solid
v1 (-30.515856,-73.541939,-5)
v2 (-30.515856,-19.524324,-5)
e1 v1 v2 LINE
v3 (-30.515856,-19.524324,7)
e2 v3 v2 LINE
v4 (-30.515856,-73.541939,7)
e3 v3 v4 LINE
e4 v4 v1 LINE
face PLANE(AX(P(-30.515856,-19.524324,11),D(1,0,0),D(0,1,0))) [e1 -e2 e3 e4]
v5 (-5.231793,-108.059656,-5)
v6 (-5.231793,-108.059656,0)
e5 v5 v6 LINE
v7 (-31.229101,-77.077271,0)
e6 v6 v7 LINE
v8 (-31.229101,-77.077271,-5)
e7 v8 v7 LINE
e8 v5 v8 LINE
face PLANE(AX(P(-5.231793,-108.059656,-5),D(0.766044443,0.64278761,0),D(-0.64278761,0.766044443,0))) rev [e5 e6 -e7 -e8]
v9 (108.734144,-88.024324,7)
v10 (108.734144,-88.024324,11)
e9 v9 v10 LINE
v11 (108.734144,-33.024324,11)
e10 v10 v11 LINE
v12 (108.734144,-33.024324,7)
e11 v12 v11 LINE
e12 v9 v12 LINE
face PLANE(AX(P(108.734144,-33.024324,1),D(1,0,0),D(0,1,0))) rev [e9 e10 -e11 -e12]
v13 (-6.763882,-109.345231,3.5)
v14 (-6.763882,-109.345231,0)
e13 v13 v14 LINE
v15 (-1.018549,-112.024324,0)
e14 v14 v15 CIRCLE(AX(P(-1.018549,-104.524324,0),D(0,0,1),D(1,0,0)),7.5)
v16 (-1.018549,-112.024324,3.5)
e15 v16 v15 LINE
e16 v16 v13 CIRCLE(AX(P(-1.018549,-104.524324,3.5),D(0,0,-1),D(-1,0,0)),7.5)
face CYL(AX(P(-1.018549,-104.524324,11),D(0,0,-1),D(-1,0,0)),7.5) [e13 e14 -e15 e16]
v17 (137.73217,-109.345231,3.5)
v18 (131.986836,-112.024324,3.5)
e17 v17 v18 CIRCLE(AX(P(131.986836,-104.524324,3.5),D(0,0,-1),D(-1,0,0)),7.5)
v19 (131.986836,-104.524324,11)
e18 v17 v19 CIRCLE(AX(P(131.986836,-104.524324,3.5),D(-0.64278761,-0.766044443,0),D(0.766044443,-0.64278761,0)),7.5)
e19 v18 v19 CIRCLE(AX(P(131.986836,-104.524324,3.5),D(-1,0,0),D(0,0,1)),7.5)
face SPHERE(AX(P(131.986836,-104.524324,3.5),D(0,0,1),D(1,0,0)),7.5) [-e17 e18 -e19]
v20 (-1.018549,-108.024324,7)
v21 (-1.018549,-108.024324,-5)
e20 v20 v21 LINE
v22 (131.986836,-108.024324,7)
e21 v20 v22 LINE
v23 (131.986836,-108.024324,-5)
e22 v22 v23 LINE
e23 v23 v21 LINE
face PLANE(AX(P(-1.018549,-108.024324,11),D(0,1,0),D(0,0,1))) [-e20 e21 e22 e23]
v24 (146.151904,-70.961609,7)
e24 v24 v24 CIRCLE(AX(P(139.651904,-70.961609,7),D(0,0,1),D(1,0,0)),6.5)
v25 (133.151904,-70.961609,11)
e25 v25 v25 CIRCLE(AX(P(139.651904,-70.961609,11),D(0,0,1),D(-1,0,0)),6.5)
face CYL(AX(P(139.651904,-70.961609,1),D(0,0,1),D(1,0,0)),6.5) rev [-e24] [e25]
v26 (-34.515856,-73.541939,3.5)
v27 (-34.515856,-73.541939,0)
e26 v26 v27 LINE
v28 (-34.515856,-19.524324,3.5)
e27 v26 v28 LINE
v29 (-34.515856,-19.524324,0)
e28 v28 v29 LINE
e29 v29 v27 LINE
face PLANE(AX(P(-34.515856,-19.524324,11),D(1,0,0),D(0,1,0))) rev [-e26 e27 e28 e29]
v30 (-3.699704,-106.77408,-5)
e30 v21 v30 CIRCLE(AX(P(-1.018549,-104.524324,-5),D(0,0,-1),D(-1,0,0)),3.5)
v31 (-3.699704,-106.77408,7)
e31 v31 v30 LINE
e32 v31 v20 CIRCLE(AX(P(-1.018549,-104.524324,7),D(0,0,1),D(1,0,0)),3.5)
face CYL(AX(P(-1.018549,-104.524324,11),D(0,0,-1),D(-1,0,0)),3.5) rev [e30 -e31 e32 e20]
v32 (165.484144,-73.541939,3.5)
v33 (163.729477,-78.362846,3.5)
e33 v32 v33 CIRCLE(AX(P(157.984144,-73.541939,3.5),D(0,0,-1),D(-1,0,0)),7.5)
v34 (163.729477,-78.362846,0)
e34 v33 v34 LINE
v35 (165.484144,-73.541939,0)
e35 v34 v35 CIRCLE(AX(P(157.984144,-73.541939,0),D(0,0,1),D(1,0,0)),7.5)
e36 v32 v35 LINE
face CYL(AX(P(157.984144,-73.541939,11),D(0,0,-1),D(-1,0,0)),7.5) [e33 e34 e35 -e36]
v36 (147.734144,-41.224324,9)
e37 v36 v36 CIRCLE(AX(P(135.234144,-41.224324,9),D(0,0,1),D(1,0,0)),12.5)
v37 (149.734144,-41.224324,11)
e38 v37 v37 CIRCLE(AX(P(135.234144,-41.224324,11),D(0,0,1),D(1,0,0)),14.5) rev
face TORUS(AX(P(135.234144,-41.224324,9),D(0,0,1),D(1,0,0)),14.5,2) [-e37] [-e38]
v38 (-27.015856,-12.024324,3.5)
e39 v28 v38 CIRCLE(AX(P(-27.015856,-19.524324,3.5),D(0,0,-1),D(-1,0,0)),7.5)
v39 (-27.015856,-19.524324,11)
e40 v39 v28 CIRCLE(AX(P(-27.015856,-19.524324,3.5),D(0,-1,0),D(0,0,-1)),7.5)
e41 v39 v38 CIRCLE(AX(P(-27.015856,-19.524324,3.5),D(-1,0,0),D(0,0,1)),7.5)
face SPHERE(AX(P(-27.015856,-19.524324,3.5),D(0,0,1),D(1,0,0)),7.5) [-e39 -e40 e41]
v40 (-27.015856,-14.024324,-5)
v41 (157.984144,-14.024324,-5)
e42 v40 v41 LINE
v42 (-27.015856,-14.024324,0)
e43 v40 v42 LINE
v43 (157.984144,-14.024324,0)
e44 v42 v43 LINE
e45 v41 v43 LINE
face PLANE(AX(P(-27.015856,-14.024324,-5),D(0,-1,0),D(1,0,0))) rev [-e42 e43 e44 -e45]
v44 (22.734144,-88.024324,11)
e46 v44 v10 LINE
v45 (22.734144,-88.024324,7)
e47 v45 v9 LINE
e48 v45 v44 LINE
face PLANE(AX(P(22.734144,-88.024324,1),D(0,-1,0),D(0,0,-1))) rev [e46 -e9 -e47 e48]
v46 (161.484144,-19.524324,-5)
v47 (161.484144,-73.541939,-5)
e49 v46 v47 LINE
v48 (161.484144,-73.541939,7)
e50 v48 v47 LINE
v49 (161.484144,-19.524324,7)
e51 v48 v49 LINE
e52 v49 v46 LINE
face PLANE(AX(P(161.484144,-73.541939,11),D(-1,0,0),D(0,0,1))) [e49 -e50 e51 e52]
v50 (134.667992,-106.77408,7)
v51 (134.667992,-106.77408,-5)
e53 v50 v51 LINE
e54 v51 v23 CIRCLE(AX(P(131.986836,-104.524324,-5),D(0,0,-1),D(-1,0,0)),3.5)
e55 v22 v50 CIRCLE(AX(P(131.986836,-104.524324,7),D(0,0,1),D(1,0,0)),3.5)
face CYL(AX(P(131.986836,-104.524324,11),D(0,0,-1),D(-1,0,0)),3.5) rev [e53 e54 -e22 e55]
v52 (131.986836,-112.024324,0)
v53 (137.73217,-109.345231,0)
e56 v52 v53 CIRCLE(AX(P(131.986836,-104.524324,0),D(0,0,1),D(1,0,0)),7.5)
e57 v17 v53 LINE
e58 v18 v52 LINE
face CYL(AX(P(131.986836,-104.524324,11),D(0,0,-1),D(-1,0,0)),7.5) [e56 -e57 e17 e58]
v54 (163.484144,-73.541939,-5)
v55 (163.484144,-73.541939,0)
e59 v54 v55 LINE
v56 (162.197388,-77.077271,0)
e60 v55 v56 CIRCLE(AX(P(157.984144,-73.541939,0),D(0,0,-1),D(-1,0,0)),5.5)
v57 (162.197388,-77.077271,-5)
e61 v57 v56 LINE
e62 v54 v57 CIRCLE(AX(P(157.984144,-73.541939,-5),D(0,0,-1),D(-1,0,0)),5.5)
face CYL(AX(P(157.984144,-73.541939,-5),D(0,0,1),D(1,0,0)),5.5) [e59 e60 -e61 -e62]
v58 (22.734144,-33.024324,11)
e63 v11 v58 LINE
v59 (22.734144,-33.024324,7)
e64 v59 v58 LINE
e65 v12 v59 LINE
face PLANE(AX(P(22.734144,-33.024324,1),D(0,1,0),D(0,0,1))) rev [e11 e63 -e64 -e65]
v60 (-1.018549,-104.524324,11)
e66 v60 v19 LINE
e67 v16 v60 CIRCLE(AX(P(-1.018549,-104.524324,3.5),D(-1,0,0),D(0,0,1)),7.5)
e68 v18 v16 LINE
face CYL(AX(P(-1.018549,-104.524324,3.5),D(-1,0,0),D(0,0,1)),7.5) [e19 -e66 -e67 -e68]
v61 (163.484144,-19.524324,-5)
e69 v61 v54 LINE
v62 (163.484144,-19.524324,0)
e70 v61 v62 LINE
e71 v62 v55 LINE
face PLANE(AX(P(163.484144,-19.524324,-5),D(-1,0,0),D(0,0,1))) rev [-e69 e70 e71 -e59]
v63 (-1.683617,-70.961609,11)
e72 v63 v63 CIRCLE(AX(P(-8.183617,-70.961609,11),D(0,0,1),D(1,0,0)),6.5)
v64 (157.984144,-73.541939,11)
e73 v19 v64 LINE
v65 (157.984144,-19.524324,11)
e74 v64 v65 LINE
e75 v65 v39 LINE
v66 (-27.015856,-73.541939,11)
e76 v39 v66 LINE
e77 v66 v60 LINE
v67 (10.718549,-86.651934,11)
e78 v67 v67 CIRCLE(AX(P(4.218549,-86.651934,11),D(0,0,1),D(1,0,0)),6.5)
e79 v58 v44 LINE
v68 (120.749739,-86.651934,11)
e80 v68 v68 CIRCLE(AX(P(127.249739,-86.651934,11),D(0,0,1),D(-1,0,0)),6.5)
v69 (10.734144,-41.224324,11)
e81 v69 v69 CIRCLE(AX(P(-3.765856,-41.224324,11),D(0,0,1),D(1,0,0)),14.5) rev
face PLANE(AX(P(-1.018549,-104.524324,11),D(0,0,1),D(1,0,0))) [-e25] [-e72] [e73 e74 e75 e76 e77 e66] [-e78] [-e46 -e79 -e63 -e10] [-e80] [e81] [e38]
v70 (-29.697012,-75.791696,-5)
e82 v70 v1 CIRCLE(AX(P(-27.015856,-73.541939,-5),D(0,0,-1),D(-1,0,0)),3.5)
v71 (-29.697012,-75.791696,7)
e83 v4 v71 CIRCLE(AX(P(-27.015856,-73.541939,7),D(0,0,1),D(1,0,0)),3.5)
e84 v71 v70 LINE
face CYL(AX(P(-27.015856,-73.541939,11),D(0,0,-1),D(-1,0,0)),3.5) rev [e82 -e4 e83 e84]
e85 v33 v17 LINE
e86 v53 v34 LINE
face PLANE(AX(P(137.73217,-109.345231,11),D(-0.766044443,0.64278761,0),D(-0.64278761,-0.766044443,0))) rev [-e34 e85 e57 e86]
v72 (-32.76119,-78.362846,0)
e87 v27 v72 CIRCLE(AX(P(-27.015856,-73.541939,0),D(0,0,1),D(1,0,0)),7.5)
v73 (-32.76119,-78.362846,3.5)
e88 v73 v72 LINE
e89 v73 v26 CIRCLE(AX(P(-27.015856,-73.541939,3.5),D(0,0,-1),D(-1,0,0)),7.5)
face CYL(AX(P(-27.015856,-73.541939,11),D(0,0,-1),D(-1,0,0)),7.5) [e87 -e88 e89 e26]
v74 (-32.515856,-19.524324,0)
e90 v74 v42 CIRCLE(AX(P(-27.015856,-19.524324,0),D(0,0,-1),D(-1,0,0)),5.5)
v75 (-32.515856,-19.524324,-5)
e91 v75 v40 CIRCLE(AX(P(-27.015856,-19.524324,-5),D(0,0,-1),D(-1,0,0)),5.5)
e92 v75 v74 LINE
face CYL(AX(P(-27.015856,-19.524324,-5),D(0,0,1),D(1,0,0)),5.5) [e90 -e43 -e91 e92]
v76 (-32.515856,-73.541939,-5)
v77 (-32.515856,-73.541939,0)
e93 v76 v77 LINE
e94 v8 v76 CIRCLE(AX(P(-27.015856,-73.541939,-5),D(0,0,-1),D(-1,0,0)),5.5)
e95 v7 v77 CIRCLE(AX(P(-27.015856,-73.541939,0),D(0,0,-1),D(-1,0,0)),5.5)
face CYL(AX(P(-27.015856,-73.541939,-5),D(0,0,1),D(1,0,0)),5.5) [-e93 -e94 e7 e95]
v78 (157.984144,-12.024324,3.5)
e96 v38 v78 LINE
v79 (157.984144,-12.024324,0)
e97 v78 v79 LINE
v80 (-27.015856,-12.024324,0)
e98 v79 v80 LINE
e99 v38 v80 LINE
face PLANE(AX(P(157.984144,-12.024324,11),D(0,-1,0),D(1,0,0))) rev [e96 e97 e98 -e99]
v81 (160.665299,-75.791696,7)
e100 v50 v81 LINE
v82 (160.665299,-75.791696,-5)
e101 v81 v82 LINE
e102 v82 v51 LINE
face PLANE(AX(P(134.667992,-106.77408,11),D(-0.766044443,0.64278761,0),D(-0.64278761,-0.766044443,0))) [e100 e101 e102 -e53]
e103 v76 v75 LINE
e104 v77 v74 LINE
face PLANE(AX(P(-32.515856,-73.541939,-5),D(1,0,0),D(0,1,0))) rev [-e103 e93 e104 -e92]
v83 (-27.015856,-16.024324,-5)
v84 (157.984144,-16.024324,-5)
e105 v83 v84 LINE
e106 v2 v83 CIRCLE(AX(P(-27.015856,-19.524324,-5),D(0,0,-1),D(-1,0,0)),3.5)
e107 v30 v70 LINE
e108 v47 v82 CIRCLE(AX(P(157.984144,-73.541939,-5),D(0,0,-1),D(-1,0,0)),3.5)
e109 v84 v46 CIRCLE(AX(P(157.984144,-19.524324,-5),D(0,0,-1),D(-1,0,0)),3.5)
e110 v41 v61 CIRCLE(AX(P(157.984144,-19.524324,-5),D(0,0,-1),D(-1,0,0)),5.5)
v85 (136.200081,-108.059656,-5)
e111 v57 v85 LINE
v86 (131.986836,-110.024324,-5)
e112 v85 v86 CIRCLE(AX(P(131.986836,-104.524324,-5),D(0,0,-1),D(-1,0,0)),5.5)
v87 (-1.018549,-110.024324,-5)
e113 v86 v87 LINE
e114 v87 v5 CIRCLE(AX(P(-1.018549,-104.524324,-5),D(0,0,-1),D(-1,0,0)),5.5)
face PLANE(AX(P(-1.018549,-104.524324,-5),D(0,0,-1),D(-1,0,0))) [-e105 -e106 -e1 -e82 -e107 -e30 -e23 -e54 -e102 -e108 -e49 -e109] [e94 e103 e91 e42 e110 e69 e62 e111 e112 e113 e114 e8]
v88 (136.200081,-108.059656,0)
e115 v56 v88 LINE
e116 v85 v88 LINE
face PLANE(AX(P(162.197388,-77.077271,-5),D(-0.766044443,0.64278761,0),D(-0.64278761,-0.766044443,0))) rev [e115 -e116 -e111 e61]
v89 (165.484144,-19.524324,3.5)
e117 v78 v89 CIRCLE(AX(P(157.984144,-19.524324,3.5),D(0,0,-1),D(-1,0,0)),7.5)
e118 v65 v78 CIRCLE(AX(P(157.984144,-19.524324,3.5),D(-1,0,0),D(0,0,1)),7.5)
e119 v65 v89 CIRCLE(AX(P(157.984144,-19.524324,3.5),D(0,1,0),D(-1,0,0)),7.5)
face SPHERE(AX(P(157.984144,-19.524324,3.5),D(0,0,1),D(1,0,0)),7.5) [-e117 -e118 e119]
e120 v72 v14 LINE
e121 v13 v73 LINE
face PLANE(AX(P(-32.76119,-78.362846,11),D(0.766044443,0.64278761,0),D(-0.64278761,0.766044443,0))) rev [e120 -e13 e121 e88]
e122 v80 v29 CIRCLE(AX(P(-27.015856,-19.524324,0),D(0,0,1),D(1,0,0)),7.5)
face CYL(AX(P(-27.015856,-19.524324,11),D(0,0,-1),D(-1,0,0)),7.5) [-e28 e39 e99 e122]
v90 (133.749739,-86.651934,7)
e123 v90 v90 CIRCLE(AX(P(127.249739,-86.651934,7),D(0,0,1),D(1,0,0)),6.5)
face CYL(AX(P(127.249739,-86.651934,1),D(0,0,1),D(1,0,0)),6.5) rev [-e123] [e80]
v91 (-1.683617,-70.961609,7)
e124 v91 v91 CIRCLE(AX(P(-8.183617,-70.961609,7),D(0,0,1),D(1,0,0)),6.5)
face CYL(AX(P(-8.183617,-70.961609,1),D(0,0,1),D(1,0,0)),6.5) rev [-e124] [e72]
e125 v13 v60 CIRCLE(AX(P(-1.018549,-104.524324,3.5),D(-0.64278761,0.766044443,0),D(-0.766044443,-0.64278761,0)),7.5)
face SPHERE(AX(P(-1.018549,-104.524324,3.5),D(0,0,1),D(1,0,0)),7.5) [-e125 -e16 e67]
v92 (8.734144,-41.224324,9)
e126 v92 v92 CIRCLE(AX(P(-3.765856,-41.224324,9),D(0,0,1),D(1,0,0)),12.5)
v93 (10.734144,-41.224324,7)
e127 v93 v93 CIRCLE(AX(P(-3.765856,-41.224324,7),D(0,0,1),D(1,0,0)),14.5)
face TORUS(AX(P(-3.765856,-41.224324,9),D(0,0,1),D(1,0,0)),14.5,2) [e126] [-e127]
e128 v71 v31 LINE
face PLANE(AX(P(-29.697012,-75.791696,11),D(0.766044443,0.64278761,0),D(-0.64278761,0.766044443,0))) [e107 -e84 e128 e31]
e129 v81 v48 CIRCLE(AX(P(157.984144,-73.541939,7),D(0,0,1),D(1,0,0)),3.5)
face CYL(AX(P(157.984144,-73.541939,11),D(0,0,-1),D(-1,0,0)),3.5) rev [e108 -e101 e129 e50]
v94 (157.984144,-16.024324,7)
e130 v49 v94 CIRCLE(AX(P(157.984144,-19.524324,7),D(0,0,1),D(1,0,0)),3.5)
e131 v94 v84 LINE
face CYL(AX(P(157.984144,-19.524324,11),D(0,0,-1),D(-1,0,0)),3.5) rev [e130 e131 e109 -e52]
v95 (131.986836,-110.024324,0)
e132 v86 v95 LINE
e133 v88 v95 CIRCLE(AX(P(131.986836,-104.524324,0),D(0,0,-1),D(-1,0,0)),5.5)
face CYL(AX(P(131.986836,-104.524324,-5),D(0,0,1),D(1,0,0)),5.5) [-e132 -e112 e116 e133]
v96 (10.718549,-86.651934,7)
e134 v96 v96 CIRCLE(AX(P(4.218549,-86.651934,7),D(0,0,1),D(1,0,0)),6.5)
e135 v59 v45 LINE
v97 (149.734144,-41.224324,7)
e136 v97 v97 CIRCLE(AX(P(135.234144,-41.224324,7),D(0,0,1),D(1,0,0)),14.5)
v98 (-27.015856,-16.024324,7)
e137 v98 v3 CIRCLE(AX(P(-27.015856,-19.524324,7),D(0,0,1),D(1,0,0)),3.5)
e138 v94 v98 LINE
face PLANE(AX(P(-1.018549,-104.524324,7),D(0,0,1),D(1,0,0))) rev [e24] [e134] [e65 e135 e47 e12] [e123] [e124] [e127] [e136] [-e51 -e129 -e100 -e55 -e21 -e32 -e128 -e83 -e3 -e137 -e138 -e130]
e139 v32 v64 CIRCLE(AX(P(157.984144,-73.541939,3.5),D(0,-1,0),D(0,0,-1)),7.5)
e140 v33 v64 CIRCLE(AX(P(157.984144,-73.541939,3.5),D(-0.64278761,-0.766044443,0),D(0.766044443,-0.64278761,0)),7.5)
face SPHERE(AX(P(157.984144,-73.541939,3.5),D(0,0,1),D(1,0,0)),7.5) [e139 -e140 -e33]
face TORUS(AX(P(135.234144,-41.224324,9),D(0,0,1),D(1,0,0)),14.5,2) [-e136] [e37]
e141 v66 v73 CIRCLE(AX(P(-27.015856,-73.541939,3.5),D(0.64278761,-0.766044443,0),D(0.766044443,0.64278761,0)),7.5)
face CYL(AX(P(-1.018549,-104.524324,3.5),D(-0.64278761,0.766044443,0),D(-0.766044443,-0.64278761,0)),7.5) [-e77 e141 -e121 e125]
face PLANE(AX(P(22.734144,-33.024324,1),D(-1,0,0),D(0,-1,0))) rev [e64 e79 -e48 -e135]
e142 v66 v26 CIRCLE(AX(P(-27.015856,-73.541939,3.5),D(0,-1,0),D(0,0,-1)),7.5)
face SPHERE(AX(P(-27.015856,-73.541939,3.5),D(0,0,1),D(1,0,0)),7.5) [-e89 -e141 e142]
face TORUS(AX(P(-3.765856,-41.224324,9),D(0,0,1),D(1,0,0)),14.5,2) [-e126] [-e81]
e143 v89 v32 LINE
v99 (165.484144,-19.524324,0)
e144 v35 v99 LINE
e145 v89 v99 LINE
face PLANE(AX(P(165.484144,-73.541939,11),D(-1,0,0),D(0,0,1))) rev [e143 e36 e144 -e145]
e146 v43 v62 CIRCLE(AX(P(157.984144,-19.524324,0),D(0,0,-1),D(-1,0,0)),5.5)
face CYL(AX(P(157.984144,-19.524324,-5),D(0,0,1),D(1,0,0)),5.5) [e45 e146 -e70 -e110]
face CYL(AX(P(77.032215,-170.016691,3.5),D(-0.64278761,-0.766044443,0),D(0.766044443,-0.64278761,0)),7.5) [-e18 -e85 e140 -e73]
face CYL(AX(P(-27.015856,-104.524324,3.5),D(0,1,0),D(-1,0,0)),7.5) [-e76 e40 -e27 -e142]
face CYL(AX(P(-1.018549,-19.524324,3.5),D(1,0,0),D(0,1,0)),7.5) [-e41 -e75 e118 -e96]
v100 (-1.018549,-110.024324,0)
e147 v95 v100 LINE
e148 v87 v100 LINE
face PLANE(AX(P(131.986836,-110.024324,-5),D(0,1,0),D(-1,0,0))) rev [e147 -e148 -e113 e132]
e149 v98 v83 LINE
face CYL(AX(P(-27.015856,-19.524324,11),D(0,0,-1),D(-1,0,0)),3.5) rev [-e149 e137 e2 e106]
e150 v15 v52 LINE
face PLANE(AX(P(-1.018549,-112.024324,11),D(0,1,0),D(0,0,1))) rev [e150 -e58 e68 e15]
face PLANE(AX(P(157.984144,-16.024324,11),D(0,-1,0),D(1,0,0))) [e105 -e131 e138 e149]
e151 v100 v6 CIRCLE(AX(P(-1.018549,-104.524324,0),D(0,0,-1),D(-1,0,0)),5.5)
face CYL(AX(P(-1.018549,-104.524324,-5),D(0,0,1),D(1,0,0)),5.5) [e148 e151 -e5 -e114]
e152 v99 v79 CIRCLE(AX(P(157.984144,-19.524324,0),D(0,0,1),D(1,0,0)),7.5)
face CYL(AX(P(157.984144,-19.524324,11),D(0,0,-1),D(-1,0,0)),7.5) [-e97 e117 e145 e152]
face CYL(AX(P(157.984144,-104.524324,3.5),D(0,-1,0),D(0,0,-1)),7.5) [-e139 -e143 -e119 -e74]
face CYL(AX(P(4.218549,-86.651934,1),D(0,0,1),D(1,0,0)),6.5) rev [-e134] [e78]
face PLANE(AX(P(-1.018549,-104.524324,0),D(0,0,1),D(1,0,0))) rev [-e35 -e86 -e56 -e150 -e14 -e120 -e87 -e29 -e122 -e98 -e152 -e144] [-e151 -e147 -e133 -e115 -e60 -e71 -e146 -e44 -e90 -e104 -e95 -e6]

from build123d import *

# Parameters (mm, degrees)
BOSS_EXTRUDE1_DEPTH = 11
SHELL1_T            = -4
FILLET1_R           = 7.5
BOSS_EXTRUDE2_START = 5
BOSS_EXTRUDE2_DEPTH = 5
SKETCH3_W           = 86
SKETCH3_H           = 55
CUT_EXTRUDE1_DEPTH  = 10
SKETCH4_R           = 12.5
SKETCH4_R_2         = 6.5
CUT_EXTRUDE2_DEPTH  = 10
FILLET2_R           = 2


with BuildPart() as part:
    # Sketch1 → Boss-Extrude1 (new body)
    with BuildSketch(Plane.XY):
        with BuildLine():
            Line((-32.761189707, -78.36284634), (-6.76388227, -109.345230875))
            ThreePointArc((-6.76388227, -109.345230875), (-4.18818591, -111.321632205), (-1.018548947, -112.024323803))
            Line((-1.018548947, -112.024323803), (131.986836181, -112.024323803))
            ThreePointArc((131.986836181, -112.024323803), (135.156473144, -111.321632205), (137.732169504, -109.345230875))
            Line((137.732169504, -109.345230875), (163.72947694, -78.36284634))
            ThreePointArc((163.72947694, -78.36284634), (165.031838273, -76.107090343), (165.484143617, -73.541939268))
            Line((165.484143617, -73.541939268), (165.484143617, -19.524323803))
            ThreePointArc((165.484143617, -19.524323803), (163.287444476, -14.221022944), (157.984143617, -12.024323803))
            Line((157.984143617, -12.024323803), (-27.015856383, -12.024323803))
            ThreePointArc((-27.015856383, -12.024323803), (-32.319157242, -14.221022944), (-34.515856383, -19.524323803))
            Line((-34.515856383, -19.524323803), (-34.515856383, -73.541939268))
            ThreePointArc((-34.515856383, -73.541939268), (-34.063551039, -76.107090343), (-32.761189707, -78.36284634))
        make_face()
    extrude(amount=BOSS_EXTRUDE1_DEPTH)

    # Shell1
    shell1_openings = [part.faces().sort_by_distance(p)[0] for p in [
        (65.484143617, -59.914594693, 0),
    ]]
    offset(amount=SHELL1_T, openings=shell1_openings, kind=Kind.INTERSECTION)

    # Fillet1
    fillet1_edges = [part.edges().sort_by_distance(p)[0] for p in [
        (135.156473144, -111.321632205, 11),
        (150.730823222, -93.854038608, 11),
        (165.031838273, -76.107090343, 11),
        (165.484143617, -46.533131535, 11),
        (163.287444476, -14.221022944, 11),
        (65.484143617, -12.024323803, 11),
        (-32.319157242, -14.221022944, 11),
        (-34.515856383, -46.533131535, 11),
        (-34.063551039, -76.107090343, 11),
        (-19.762535988, -93.854038608, 11),
        (-4.18818591, -111.321632205, 11),
        (65.484143617, -112.024323803, 11),
    ]]
    fillet(fillet1_edges, radius=FILLET1_R)

    # Sketch2 → Boss-Extrude2 (add)
    with BuildSketch(Plane(origin=(0, 0, 0), x_dir=(-1, 0, 0), z_dir=(0, 0, -1)).offset(BOSS_EXTRUDE2_START)):
        with BuildLine():
            Line((5.231793384, -108.059655656), (31.22910082, -77.077271121))
            ThreePointArc((31.22910082, -77.077271121), (32.184165797, -75.423050056), (32.515856383, -73.541939268))
            Line((32.515856383, -73.541939268), (32.515856383, -19.524323803))
            ThreePointArc((32.515856383, -19.524323803), (30.90494368, -15.635236506), (27.015856383, -14.024323803))
            Line((27.015856383, -14.024323803), (-157.984143617, -14.024323803))
            ThreePointArc((-157.984143617, -14.024323803), (-161.873230913, -15.635236506), (-163.484143617, -19.524323803))
            Line((-163.484143617, -19.524323803), (-163.484143617, -73.541939268))
            ThreePointArc((-163.484143617, -73.541939268), (-163.152453031, -75.423050056), (-162.197388054, -77.077271121))
            Line((-162.197388054, -77.077271121), (-136.200080618, -108.059655656))
            ThreePointArc((-136.200080618, -108.059655656), (-134.31123662, -109.509016631), (-131.986836181, -110.024323803))
            Line((-131.986836181, -110.024323803), (1.018548947, -110.024323803))
            ThreePointArc((1.018548947, -110.024323803), (3.342949387, -109.509016631), (5.231793384, -108.059655656))
        make_face()
        with BuildLine():
            Line((3.699704498, -106.774080437), (29.697011934, -75.791695902))
            ThreePointArc((29.697011934, -75.791695902), (30.304780556, -74.739009769), (30.515856383, -73.541939268))
            Line((30.515856383, -73.541939268), (30.515856383, -19.524323803))
            ThreePointArc((30.515856383, -19.524323803), (29.490730117, -17.049450068), (27.015856383, -16.024323803))
            Line((27.015856383, -16.024323803), (-157.984143617, -16.024323803))
            ThreePointArc((-157.984143617, -16.024323803), (-160.459017351, -17.049450068), (-161.484143617, -19.524323803))
            Line((-161.484143617, -19.524323803), (-161.484143617, -73.541939268))
            ThreePointArc((-161.484143617, -73.541939268), (-161.27306779, -74.739009769), (-160.665299168, -75.791695902))
            Line((-160.665299168, -75.791695902), (-134.667991732, -106.774080437))
            ThreePointArc((-134.667991732, -106.774080437), (-133.466000097, -107.696401057), (-131.986836181, -108.024323803))
            Line((-131.986836181, -108.024323803), (1.018548947, -108.024323803))
            ThreePointArc((1.018548947, -108.024323803), (2.497712863, -107.696401057), (3.699704498, -106.774080437))
        make_face(mode=Mode.SUBTRACT)
    extrude(amount=-BOSS_EXTRUDE2_DEPTH)

    # Sketch3 → Cut-Extrude1 (cut)
    with BuildSketch(Plane.XY.offset(11)):
        with Locations((65.734143617, -60.524323803)):
            Rectangle(SKETCH3_W, SKETCH3_H)
    extrude(amount=-CUT_EXTRUDE1_DEPTH, mode=Mode.SUBTRACT)

    # Sketch4 → Cut-Extrude2 (cut)
    with BuildSketch(Plane.XY.offset(11)):
        with Locations((-3.765856383, -41.224323803)):
            Circle(SKETCH4_R)
        with Locations((-8.183616573, -70.961609401)):
            Circle(SKETCH4_R_2)
        with Locations((4.218548656, -86.65193437)):
            Circle(SKETCH4_R_2)
        with Locations((127.249738577, -86.65193437)):
            Circle(SKETCH4_R_2)
        with Locations((139.651903807, -70.961609401)):
            Circle(SKETCH4_R_2)
        with Locations((135.234143617, -41.224323803)):
            Circle(SKETCH4_R)
    extrude(amount=-CUT_EXTRUDE2_DEPTH, mode=Mode.SUBTRACT)

    # Fillet2
    fillet2_edges = [part.edges().sort_by_distance(p)[0] for p in [
        (122.734143617, -41.224323803, 7),
        (122.734143617, -41.224323803, 11),
        (-16.265856383, -41.224323803, 7),
        (-16.265856383, -41.224323803, 11),
    ]]
    fillet(fillet2_edges, radius=FILLET2_R - 0.0001)  # a hair under: the kernel refuses the full size


solid = part.part
